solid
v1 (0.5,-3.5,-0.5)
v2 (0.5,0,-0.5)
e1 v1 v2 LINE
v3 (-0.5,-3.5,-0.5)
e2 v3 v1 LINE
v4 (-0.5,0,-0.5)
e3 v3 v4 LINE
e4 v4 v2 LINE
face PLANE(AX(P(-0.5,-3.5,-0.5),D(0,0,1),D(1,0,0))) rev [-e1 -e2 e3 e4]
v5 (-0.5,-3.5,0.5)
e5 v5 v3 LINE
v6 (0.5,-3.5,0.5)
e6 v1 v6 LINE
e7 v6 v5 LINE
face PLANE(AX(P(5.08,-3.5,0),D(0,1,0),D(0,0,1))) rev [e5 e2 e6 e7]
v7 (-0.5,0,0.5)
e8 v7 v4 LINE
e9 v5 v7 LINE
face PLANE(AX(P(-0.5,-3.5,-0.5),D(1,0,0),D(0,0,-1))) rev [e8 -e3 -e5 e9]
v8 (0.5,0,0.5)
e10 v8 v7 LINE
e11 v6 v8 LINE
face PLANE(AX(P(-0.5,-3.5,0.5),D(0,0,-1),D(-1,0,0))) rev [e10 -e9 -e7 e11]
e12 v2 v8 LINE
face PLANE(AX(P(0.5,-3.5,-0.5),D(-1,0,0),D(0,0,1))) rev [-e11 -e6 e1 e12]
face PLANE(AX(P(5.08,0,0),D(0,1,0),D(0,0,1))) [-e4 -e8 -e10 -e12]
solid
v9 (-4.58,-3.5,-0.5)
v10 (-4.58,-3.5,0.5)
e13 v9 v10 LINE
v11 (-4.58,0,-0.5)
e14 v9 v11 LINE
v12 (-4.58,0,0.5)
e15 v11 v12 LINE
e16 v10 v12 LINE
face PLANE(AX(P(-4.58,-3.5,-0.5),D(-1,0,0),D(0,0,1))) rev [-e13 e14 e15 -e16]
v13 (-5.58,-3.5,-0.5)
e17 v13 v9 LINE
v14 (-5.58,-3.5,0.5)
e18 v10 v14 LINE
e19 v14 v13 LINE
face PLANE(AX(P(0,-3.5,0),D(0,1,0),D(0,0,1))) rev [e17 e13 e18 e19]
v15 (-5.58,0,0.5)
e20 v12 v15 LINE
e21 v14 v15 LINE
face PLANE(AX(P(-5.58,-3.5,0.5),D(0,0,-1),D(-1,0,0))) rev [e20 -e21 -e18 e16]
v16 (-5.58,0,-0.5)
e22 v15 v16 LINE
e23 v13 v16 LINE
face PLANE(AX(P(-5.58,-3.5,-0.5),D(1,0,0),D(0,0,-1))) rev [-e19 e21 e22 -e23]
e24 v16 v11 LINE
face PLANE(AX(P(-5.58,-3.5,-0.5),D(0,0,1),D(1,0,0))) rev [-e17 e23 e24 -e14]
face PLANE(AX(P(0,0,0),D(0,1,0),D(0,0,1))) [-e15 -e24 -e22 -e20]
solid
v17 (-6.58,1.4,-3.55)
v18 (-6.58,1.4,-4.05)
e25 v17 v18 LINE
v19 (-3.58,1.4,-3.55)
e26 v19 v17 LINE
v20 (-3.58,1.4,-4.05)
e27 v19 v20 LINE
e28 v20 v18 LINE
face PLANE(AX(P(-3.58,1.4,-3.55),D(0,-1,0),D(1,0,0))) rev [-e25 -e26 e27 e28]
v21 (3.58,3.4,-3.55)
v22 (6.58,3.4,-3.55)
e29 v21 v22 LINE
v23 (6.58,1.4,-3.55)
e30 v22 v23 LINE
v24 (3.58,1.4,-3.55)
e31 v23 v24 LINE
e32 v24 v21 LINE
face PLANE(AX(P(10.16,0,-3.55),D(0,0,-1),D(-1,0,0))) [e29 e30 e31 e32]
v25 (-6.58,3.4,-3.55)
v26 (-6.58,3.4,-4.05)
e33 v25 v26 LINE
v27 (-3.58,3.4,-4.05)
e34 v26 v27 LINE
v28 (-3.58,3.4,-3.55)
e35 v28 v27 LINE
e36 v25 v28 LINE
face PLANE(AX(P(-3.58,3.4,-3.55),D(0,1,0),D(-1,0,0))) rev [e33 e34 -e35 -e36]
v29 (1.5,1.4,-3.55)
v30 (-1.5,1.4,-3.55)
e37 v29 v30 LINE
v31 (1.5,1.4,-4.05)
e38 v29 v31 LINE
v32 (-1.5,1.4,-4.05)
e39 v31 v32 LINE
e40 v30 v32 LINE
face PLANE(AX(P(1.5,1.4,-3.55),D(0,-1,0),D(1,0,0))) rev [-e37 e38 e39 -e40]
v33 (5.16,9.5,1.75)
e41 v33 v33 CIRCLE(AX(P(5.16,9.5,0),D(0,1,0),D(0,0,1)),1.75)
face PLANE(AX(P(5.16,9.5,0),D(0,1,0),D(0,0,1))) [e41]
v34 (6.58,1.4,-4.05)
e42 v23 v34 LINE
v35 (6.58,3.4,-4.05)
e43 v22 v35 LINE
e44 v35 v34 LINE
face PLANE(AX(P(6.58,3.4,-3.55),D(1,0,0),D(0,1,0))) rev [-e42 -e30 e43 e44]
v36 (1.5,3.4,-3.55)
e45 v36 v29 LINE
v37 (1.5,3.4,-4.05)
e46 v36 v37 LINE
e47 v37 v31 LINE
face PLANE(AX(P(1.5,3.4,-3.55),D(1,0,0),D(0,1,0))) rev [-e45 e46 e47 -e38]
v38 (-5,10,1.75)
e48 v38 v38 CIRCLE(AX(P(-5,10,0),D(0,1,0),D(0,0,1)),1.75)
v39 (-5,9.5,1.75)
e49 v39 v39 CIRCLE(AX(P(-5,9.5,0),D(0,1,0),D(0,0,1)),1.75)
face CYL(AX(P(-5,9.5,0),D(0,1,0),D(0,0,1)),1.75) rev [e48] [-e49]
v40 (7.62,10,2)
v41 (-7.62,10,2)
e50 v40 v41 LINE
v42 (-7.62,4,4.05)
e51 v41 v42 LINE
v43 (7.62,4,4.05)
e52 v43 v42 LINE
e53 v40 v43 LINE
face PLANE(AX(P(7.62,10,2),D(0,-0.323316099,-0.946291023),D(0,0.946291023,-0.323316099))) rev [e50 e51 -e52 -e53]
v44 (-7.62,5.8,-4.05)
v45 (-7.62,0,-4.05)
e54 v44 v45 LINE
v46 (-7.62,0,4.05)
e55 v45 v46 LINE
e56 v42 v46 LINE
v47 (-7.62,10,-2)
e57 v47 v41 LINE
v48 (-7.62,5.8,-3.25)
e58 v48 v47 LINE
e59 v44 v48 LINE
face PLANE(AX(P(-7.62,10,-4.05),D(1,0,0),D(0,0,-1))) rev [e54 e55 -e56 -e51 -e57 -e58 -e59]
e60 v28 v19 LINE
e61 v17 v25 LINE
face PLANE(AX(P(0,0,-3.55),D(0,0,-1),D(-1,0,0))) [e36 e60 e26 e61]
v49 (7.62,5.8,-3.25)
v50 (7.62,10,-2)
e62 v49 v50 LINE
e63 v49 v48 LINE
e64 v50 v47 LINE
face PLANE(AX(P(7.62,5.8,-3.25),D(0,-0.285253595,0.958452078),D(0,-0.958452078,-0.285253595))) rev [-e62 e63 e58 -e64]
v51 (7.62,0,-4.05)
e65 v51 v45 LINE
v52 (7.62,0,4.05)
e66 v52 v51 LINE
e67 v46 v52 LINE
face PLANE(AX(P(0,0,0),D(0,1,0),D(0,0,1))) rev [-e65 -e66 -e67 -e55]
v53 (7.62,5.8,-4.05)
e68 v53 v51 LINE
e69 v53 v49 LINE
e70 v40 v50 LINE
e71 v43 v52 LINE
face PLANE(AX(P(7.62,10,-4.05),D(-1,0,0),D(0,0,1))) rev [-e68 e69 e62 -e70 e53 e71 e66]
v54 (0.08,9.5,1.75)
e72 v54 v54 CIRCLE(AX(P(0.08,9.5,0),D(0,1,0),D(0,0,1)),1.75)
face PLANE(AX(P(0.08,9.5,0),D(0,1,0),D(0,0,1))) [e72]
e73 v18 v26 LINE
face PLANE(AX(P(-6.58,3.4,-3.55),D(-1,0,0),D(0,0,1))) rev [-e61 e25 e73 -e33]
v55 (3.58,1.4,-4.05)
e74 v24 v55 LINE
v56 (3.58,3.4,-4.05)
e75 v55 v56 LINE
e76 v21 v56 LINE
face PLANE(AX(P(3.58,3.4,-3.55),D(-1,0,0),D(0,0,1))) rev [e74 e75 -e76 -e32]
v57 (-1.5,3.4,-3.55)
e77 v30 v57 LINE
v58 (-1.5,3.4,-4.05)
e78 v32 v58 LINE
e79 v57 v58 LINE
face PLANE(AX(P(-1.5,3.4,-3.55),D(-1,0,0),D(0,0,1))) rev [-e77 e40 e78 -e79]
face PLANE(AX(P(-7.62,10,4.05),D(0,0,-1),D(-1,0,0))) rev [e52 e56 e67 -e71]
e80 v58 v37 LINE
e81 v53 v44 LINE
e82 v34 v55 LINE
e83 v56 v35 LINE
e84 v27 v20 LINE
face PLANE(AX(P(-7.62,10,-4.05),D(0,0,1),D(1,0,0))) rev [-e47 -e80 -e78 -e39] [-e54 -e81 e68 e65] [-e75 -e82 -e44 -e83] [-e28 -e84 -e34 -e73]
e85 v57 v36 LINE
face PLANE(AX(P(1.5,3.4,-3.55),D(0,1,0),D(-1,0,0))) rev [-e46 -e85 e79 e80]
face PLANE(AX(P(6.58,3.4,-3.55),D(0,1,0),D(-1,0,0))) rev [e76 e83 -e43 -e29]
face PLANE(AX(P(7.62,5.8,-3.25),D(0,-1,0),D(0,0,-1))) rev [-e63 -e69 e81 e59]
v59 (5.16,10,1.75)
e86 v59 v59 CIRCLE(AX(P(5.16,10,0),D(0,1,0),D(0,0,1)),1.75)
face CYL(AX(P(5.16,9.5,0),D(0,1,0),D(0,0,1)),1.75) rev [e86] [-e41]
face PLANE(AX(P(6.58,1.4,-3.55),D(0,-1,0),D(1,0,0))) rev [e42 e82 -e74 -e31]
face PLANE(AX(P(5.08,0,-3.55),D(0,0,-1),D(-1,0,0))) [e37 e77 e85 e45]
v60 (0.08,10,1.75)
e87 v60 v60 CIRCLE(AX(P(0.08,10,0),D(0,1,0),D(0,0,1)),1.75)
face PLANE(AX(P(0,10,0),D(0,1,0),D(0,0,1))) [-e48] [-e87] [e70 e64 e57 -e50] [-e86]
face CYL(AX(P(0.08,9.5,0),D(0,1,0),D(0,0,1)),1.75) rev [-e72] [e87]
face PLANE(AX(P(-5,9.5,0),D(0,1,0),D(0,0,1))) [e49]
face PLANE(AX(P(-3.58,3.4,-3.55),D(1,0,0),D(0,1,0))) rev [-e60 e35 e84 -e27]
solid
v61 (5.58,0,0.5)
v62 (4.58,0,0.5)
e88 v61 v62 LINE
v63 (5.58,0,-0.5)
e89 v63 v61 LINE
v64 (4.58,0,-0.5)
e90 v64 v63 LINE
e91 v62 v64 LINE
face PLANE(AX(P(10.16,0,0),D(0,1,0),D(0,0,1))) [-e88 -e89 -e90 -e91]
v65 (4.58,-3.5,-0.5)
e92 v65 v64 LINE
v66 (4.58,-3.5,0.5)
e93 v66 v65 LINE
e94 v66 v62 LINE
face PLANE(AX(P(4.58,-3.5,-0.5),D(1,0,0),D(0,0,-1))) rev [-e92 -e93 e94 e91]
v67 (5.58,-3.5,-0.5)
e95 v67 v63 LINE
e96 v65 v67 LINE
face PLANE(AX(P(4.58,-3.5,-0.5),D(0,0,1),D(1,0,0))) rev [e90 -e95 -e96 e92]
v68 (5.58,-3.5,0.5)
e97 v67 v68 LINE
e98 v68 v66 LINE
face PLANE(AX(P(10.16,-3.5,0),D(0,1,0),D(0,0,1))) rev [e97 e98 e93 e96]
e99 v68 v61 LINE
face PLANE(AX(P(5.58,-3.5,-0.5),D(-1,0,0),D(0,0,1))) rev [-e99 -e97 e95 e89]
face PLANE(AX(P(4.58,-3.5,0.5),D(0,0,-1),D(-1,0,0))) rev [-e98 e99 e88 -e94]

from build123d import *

# Parameters (mm, degrees)
SKETCH3_W             = 15.24
SKETCH3_H             = 8.1
BOSS_EXTRUDE3_DEPTH   = 10
CUT_EXTRUDE1_DEPTH    = 19.672442261
SKETCH5_R             = 1.75
CUT_EXTRUDE2_DEPTH    = 0.5
SKETCH6_W             = 3
SKETCH6_H             = 2
CUT_EXTRUDE4_DEPTH    = 0.5
SKETCH7_W             = 1
SKETCH7_H             = 1
BOSS_EXTRUDE4_DEPTH   = 3.5
LPATTERN2_START       = 4.58
LPATTERN2_OUTLINE_W   = 3.5
LPATTERN2_OUTLINE_H   = 1
LPATTERN2_DEPTH       = 1
LPATTERN2_START_2     = -0.5
LPATTERN2_2_OUTLINE_W = 3.5
LPATTERN2_2_OUTLINE_H = 1
LPATTERN2_2_DEPTH     = 1
LPATTERN2_START_3     = 9.5
LPATTERN2_3_OUTLINE_R = 1.75
LPATTERN2_3_DEPTH     = 0.5
LPATTERN2_START_4     = 1.4
LPATTERN2_4_OUTLINE_W = 3
LPATTERN2_4_OUTLINE_H = 0.5
LPATTERN2_4_DEPTH     = 2


# Read off the part's stored shape, not the designer's step: LPattern2
with BuildPart() as part:
    # Sketch3 → Boss-Extrude3 (new body)
    with BuildSketch(Plane(origin=(0, 0, 0), x_dir=(1, 0, 0), z_dir=(0, 1, 0))):
        Rectangle(SKETCH3_W, SKETCH3_H)
    extrude(amount=BOSS_EXTRUDE3_DEPTH)

    # Sketch4 → Cut-Extrude1 (cut, through all)
    with BuildSketch(Plane.ZY.offset(7.62)):
        Polygon((-3.25, 5.8), (-2, 10), (-3.25, 10), (-4.05, 10), (-4.05, 5.8), align=None)
        Polygon((4.05, 10), (2, 10), (4.05, 4), align=None)
    extrude(amount=-CUT_EXTRUDE1_DEPTH, mode=Mode.SUBTRACT)

    # Sketch5 → Cut-Extrude2 (cut)
    with BuildSketch(Plane(origin=(0, 10, 0), x_dir=(1, 0, 0), z_dir=(0, 1, 0))):
        with Locations(Location((-5, 0, 0), (0, 0, 270))):
            Circle(SKETCH5_R)
    extrude(amount=-CUT_EXTRUDE2_DEPTH, mode=Mode.SUBTRACT)

    # Sketch6 → Cut-Extrude4 (cut)
    with BuildSketch(Plane(origin=(0, 0, -4.05), x_dir=(-1, 0, 0), z_dir=(0, 0, -1))):
        with Locations((5.08, 2.4)):
            Rectangle(SKETCH6_W, SKETCH6_H)
    extrude(amount=-CUT_EXTRUDE4_DEPTH, mode=Mode.SUBTRACT)

    # LPattern2 3 outline → LPattern2 3 (cut)
    with BuildSketch(Plane(origin=(0, 0, 0), x_dir=(1, 0, 0), z_dir=(0, 1, 0)).offset(LPATTERN2_START_3)):
        with Locations((5.16, 0)):
            Circle(LPATTERN2_3_OUTLINE_R)
        with Locations((0.08, 0)):
            Circle(LPATTERN2_3_OUTLINE_R)
    extrude(amount=LPATTERN2_3_DEPTH, mode=Mode.SUBTRACT)

    # LPattern2 4 outline → LPattern2 4 (cut)
    with BuildSketch(Plane(origin=(0, 0, 0), x_dir=(1, 0, 0), z_dir=(0, 1, 0)).offset(LPATTERN2_START_4)):
        with Locations((0, 3.8)):
            Rectangle(LPATTERN2_4_OUTLINE_W, LPATTERN2_4_OUTLINE_H)
        with Locations((5.08, 3.8)):
            Rectangle(LPATTERN2_4_OUTLINE_W, LPATTERN2_4_OUTLINE_H)
    extrude(amount=LPATTERN2_4_DEPTH, mode=Mode.SUBTRACT)


with BuildPart() as body_2:
    # Sketch7 → Boss-Extrude4 (new body)
    with BuildSketch(Plane.XZ):
        with Locations((-5.08, 0)):
            Rectangle(SKETCH7_W, SKETCH7_H)
    extrude(amount=BOSS_EXTRUDE4_DEPTH)


with BuildPart() as body_3:
    # LPattern2 outline → LPattern2 (new body)
    with BuildSketch(Plane.YZ.offset(LPATTERN2_START)):
        with Locations((-1.75, 0)):
            Rectangle(LPATTERN2_OUTLINE_W, LPATTERN2_OUTLINE_H)
    extrude(amount=LPATTERN2_DEPTH)


with BuildPart() as body_4:
    # LPattern2 2 outline → LPattern2 2 (new body)
    with BuildSketch(Plane.YZ.offset(LPATTERN2_START_2)):
        with Locations((-1.75, 0)):
            Rectangle(LPATTERN2_2_OUTLINE_W, LPATTERN2_2_OUTLINE_H)
    extrude(amount=LPATTERN2_2_DEPTH)


solid = Compound([part.part, body_2.part, body_3.part, body_4.part])
